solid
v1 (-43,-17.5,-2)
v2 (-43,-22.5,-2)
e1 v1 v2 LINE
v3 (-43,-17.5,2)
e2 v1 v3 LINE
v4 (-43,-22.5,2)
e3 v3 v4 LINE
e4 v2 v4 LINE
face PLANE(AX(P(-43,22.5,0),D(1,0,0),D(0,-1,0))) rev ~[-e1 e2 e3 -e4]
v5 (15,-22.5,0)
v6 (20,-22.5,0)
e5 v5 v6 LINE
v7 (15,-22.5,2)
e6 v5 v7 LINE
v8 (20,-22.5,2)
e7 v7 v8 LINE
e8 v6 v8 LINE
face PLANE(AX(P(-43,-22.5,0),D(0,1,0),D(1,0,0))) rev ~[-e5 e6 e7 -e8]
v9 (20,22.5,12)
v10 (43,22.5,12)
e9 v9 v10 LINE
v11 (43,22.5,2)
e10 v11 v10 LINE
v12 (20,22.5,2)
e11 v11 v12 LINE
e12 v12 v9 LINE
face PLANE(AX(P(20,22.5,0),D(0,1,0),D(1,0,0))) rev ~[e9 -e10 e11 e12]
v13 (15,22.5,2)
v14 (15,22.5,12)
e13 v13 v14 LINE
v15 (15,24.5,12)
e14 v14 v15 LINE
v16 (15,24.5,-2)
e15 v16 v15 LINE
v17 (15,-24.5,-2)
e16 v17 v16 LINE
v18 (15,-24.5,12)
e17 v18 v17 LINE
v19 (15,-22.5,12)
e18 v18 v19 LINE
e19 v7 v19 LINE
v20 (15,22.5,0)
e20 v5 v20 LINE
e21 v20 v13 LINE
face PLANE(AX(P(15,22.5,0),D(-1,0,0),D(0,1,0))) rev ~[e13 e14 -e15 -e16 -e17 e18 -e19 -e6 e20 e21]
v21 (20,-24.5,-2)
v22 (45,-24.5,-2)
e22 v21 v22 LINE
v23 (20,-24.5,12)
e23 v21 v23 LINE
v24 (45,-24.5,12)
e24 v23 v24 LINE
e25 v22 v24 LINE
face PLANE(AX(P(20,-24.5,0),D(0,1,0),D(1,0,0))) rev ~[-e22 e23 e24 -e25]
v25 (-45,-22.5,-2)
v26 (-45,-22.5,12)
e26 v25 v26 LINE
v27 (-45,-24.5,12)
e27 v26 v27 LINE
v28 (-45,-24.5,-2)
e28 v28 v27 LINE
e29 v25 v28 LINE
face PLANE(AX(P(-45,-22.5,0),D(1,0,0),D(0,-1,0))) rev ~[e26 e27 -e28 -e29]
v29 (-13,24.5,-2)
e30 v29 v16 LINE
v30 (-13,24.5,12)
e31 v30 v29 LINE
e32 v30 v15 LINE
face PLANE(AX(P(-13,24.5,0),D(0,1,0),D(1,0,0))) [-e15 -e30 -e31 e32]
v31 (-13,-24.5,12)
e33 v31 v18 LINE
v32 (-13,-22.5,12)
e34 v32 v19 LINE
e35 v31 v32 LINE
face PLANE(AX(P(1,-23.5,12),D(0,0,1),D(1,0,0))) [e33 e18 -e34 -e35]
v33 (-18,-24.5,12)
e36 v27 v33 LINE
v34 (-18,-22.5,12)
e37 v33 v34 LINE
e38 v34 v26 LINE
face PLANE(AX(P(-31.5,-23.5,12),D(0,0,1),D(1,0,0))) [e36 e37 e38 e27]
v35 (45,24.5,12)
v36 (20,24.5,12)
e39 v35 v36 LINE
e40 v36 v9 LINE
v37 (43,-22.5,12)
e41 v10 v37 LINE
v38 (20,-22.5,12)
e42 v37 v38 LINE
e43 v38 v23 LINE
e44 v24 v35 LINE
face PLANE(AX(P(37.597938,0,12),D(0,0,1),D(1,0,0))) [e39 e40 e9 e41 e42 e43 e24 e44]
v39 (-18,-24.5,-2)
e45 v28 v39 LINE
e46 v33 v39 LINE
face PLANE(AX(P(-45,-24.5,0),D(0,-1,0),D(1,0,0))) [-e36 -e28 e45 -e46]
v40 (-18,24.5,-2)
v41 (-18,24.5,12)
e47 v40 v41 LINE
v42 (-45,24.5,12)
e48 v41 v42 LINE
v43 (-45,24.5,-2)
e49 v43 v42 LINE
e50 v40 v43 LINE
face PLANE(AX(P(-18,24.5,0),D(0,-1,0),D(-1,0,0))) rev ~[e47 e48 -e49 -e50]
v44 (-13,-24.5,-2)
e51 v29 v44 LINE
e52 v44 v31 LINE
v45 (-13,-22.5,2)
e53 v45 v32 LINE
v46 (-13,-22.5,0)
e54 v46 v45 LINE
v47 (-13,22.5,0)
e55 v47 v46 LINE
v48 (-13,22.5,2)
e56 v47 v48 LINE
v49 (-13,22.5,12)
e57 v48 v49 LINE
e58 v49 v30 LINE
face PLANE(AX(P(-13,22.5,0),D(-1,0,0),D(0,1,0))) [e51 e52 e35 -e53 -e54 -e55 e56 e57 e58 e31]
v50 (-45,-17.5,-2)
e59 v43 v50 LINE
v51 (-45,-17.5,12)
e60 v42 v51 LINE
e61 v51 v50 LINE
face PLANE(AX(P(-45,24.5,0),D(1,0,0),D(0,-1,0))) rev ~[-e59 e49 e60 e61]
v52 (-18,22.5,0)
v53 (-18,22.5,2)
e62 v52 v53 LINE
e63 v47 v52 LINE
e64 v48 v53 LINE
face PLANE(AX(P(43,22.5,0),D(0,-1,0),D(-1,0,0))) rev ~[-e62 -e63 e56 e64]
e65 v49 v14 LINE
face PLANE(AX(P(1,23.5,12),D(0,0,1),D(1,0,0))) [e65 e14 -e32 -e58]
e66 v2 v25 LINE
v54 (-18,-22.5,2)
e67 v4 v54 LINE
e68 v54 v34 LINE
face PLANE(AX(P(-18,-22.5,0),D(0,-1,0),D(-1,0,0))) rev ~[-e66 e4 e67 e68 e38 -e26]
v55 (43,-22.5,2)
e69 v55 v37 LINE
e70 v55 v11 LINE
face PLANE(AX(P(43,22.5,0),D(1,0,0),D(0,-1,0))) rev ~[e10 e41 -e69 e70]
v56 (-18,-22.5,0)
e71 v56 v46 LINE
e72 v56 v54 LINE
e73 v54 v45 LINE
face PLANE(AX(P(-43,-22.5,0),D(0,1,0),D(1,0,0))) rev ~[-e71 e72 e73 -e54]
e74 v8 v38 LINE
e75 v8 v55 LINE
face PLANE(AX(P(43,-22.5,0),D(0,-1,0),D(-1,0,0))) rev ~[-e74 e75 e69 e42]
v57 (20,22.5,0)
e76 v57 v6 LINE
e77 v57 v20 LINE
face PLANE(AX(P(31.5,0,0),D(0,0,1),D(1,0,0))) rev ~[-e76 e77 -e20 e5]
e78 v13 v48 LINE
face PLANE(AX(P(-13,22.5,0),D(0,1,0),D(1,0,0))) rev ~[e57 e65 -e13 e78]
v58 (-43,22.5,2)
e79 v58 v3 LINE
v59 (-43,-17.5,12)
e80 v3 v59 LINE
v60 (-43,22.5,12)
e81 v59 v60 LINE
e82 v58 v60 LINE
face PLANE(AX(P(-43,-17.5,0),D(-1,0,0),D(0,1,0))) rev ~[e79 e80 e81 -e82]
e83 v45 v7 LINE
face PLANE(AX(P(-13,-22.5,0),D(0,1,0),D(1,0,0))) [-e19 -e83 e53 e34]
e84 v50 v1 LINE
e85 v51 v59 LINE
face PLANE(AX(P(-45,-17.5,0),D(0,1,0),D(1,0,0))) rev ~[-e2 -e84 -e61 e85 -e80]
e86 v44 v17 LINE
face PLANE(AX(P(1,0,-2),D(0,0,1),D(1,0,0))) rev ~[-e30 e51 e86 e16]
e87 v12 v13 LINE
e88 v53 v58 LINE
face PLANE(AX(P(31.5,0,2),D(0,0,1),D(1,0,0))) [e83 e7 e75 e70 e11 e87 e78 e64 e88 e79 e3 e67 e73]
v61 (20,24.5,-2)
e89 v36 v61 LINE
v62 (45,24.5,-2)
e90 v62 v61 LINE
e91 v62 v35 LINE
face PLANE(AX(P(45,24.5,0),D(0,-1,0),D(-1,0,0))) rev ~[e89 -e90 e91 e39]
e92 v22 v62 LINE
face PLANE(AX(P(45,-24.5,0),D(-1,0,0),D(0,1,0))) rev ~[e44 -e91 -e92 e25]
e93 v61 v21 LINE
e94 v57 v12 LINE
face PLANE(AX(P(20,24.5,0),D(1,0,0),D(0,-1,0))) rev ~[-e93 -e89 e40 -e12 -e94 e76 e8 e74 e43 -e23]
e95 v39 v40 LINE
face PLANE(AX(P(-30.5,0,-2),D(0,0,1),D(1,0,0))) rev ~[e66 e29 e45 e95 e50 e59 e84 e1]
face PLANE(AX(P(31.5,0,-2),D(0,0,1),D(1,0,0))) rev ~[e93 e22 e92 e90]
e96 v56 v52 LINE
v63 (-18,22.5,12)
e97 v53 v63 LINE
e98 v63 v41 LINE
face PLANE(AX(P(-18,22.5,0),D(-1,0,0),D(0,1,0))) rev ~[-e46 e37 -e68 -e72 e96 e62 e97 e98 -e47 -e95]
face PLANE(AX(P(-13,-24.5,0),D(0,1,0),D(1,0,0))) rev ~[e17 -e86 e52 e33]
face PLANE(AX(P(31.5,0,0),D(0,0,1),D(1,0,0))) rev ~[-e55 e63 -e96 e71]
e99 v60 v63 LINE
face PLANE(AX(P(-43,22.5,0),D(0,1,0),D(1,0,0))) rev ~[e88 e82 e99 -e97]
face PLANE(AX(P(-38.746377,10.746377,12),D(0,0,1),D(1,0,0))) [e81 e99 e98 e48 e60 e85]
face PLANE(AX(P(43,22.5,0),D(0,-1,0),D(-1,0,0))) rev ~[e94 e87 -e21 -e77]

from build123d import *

# Parameters (mm, degrees)
F1_DEPTH = 2
F0_W     = 28.0000002682
F0_H     = 45
F0_H_2   = 2
F0_W_2   = 23
F0_W_3   = 4.9999997318
F0_W_4   = 5
F2_DEPTH = 2
F3_DEPTH = 12


with BuildPart() as f1:
    # F0 (on Top) → F1 (new body)
    with BuildSketch(Plane.XY):
        Polygon((-18, 22.5), (-43, 22.5), (-43, -17.5), (-43, -22.5), (-18, -22.5), align=None)
        Polygon((-18, -24.5), (-18, -22.5), (-43, -22.5), (-45, -22.5), (-45, -24.5), align=None)
        Polygon((-43, -17.5), (-43, 22.5), (-18, 22.5), (-18, 24.5), (-45, 24.5), (-45, -17.5), align=None)
    extrude(amount=-F1_DEPTH)



with BuildPart() as f1b:
    # F0 (on Top) → F1, piece 2 (new body)
    with BuildSketch(Plane.XY):
        with Locations((0.9999998659, 0)):
            Rectangle(F0_W, F0_H)
        with Locations((0.9999998659, -23.5)):
            Rectangle(F0_W, F0_H_2)
        with Locations((0.9999998659, 23.5)):
            Rectangle(F0_W, F0_H_2)
    extrude(amount=-F1_DEPTH)


with BuildPart() as f1c:
    # F0 (on Top) → F1, piece 3 (new body)
    with BuildSketch(Plane.XY):
        with Locations((31.5, 0)):
            Rectangle(F0_W_2, F0_H)
        Polygon((20, 24.5), (20, 22.5), (43, 22.5), (43, -22.5), (20, -22.5), (20, -24.5), (45, -24.5), (45, 24.5), align=None)
    extrude(amount=-F1_DEPTH)


with BuildPart() as f1_1:
    add(f1.part)

    add(f1b.part)  # F2 merges F1b

    add(f1c.part)  # F2 merges F1c
    # F0 (on Top) → F2 (join)
    with BuildSketch(Plane.XY):
        with Locations((31.5, 0)):
            Rectangle(F0_W_2, F0_H)
        with Locations((0.9999998659, 0)):
            Rectangle(F0_W, F0_H)
        Polygon((-18, 22.5), (-43, 22.5), (-43, -17.5), (-43, -22.5), (-18, -22.5), align=None)
        with Locations((-15.5000001341, 0)):
            Rectangle(F0_W_3, F0_H)
        with Locations((17.5, 0)):
            Rectangle(F0_W_4, F0_H)
    extrude(amount=F2_DEPTH)

    # F0 (on Top) → F3 (join)
    with BuildSketch(Plane.XY):
        Polygon((-43, -17.5), (-43, 22.5), (-18, 22.5), (-18, 24.5), (-45, 24.5), (-45, -17.5), align=None)
        Polygon((-18, -24.5), (-18, -22.5), (-43, -22.5), (-45, -22.5), (-45, -24.5), align=None)
        with Locations((0.9999998659, -23.5)):
            Rectangle(F0_W, F0_H_2)
        with Locations((0.9999998659, 23.5)):
            Rectangle(F0_W, F0_H_2)
        Polygon((20, 24.5), (20, 22.5), (43, 22.5), (43, -22.5), (20, -22.5), (20, -24.5), (45, -24.5), (45, 24.5), align=None)
    extrude(amount=F3_DEPTH)


solid = f1_1.part
